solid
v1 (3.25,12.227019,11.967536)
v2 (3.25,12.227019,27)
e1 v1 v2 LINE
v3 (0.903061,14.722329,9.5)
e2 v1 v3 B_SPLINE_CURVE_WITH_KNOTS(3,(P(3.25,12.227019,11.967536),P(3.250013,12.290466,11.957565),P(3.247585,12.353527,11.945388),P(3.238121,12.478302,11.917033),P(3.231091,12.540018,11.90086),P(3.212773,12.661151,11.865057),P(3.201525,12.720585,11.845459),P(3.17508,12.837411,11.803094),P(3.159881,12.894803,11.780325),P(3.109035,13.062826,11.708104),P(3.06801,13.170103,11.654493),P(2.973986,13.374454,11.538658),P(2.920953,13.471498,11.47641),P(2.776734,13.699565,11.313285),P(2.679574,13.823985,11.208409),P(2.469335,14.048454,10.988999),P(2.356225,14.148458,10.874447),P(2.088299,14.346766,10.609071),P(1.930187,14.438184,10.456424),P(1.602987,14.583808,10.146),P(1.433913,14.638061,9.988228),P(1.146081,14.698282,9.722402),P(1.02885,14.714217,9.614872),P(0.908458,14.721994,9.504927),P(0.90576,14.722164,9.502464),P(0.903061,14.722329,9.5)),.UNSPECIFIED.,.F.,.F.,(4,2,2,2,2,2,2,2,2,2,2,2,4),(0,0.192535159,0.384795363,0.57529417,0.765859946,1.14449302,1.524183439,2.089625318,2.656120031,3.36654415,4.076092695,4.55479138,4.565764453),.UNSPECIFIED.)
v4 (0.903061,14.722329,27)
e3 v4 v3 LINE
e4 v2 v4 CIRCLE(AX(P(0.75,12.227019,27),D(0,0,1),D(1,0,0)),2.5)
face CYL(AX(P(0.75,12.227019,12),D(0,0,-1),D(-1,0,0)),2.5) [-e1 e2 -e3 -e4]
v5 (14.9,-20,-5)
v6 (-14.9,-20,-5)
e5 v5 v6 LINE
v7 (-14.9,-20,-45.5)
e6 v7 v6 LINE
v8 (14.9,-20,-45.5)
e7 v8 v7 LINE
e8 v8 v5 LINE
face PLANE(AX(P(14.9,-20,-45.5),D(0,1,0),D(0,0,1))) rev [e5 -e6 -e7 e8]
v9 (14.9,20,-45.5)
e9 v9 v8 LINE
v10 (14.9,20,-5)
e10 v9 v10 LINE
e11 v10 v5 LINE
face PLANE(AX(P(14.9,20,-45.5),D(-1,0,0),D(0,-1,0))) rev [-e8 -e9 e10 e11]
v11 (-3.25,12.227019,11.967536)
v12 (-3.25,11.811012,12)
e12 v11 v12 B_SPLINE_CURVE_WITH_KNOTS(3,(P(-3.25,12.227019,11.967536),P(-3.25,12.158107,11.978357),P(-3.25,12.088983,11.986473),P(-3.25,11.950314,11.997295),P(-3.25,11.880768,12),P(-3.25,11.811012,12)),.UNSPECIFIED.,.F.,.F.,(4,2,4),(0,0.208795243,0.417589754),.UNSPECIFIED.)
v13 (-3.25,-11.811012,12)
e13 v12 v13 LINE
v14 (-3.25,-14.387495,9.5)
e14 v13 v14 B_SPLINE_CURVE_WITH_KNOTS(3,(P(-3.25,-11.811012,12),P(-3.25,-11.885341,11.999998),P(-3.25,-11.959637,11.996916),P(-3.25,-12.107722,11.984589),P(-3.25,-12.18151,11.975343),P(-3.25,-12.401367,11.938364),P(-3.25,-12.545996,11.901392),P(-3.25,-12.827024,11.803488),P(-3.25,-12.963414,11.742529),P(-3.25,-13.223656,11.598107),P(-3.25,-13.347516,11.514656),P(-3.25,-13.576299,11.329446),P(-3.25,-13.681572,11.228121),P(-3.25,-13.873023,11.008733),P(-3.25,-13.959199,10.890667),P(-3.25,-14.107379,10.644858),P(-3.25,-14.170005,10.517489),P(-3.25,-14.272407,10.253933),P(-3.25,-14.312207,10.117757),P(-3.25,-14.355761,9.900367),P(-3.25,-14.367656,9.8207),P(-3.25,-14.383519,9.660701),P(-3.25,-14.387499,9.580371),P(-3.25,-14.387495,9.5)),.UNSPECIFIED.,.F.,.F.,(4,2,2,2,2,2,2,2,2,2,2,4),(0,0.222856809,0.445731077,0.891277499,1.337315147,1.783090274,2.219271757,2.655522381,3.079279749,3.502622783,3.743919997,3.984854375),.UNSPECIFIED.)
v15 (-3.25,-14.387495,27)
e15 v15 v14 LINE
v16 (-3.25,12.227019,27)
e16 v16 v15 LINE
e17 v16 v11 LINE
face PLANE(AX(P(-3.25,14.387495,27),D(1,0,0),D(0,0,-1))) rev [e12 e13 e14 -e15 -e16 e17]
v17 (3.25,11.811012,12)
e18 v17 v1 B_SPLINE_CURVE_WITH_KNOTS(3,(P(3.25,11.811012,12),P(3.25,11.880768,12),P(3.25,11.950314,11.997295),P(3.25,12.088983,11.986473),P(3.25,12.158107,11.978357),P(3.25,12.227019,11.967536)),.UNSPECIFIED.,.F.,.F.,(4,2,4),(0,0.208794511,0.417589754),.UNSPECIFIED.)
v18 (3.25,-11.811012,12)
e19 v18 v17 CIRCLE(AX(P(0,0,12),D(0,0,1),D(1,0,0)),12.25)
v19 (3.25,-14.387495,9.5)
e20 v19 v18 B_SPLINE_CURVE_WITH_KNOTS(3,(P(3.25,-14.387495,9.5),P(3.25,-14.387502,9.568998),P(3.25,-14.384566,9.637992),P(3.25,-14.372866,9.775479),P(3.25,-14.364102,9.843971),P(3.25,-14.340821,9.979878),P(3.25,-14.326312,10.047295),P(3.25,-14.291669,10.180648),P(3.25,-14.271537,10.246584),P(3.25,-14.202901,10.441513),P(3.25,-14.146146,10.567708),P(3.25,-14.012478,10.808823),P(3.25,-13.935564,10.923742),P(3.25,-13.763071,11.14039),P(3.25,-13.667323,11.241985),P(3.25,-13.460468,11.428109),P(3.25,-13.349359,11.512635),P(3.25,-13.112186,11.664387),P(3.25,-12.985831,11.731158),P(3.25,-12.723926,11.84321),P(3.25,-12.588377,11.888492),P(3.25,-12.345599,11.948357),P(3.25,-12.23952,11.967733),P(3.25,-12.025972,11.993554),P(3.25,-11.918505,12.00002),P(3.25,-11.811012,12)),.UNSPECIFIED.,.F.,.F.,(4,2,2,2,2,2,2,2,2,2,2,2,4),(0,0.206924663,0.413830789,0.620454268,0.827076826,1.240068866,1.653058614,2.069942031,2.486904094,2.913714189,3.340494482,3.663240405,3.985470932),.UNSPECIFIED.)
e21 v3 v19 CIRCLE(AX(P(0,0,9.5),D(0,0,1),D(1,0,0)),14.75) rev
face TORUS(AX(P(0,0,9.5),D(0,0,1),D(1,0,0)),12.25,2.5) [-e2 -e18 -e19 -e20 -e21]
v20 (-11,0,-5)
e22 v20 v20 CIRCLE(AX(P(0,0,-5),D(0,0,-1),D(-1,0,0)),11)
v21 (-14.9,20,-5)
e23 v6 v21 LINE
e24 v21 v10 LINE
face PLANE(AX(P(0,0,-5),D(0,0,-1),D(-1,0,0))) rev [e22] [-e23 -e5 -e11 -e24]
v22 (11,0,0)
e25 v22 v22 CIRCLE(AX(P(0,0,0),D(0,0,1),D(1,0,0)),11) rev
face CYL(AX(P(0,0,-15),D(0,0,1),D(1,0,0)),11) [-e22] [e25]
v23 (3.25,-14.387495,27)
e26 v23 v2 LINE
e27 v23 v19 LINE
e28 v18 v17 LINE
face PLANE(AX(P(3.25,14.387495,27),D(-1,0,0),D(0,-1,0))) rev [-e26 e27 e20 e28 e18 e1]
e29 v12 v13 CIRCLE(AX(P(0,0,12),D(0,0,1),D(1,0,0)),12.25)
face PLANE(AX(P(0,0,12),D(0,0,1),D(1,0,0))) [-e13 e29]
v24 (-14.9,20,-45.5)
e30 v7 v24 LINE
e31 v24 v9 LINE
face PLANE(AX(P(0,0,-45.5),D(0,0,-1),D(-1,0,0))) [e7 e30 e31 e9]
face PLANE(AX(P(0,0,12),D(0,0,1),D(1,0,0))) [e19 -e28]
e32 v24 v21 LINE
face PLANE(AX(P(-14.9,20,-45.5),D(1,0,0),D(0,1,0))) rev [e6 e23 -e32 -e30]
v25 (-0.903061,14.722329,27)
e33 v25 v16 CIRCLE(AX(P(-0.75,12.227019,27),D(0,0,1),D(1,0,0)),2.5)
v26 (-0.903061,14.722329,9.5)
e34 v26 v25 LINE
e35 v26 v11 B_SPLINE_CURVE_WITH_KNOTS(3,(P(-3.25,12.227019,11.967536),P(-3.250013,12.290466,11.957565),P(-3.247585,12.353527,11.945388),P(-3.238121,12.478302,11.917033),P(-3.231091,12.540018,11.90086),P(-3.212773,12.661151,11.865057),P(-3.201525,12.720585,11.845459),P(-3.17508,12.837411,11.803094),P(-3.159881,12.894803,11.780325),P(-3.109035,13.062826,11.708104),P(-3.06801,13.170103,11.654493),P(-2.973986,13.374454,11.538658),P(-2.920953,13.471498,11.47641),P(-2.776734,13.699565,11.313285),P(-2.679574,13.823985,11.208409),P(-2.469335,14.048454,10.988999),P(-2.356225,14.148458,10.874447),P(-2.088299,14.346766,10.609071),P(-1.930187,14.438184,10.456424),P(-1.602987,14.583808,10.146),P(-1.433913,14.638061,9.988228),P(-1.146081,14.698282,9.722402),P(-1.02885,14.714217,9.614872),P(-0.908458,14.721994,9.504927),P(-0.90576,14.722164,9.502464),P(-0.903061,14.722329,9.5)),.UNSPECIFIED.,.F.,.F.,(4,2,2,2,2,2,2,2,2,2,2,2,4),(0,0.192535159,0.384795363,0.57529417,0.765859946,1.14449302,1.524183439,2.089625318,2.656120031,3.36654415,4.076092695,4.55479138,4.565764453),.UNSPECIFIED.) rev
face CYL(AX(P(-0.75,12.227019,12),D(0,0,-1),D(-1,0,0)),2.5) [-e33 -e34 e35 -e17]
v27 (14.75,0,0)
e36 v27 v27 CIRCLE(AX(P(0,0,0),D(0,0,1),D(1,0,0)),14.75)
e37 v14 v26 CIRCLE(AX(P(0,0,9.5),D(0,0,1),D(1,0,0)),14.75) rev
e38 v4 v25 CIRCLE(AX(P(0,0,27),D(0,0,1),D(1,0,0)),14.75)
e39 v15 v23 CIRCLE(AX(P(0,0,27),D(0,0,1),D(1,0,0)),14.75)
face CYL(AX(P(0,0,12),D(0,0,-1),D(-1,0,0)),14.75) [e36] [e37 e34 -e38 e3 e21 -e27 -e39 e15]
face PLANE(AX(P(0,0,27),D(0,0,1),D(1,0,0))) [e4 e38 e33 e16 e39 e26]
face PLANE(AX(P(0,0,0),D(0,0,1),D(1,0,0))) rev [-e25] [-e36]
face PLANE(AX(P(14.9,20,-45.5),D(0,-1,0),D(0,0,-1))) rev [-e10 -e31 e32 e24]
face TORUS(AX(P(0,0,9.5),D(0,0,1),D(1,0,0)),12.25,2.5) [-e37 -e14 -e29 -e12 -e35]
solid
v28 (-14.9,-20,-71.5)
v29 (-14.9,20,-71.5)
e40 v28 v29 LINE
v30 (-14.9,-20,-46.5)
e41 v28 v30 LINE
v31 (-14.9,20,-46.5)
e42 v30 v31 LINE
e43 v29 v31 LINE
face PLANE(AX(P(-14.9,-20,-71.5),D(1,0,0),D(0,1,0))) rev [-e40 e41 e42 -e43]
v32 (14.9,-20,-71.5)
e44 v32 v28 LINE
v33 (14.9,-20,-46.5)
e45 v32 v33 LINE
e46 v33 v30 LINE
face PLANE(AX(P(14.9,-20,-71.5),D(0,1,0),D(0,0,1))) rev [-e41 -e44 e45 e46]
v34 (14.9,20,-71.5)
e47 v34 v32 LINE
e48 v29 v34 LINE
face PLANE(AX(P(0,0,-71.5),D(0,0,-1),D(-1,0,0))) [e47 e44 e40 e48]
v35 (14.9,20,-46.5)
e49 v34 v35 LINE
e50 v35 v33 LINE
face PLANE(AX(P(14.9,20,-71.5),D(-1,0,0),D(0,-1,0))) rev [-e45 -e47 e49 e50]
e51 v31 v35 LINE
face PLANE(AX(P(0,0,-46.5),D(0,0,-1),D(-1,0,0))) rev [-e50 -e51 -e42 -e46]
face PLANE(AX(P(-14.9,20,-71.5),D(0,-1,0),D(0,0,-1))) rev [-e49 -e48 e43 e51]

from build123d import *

# Parameters (mm, degrees)
SKETCH1_R           = 14.75
BOSS_EXTRUDE1_DEPTH = 12
BOSS_EXTRUDE2_DEPTH = 15
FILLET1_START       = 12
FILLET1_DEPTH       = 16
FILLET1_START_2     = 9.4999999
FILLET1_2_DEPTH     = 2.5000001
SKETCH3_R           = 11
BOSS_EXTRUDE3_DEPTH = 15
BOSS_EXTRUDE4_START = 5
SKETCH4_W           = 29.8
SKETCH4_H           = 40
BOSS_EXTRUDE4_DEPTH = 40.5
BOSS_EXTRUDE6_START = 1
SKETCH6_W           = 29.8
SKETCH6_H           = 40
BOSS_EXTRUDE6_DEPTH = 25


with BuildPart() as part:
    # Sketch1 → Boss-Extrude1 (new body)
    with BuildSketch(Plane.XY):
        Circle(SKETCH1_R)
    extrude(amount=BOSS_EXTRUDE1_DEPTH)

    # Sketch2 → Boss-Extrude2 (add)
    with BuildSketch(Plane.XY.offset(12)):
        with BuildLine():
            Line((-3.25, 14.38749457), (-3.25, -14.38749457))
            ThreePointArc((-3.25, -14.38749457), (0, -14.75), (3.25, -14.38749457))
            Line((3.25, -14.38749457), (3.25, 14.38749457))
            ThreePointArc((3.25, 14.38749457), (0, 14.75), (-3.25, 14.38749457))
        make_face()
    extrude(amount=BOSS_EXTRUDE2_DEPTH)

    # Fillet1: read off the stored shape, not the designer's step
    # Fillet1 outline → Fillet1 (cut)
    with BuildSketch(Plane.XY.offset(FILLET1_START)):
        with BuildLine():
            Line((-3.25, 14.38749457), (-3.25, 12.227019261))
            ThreePointArc((-3.25, 12.227019261), (-2.571078397, 13.939816234), (-0.903061224, 14.722329314))
            ThreePointArc((-0.903061224, 14.722329314), (-2.083268576, 14.602139982), (-3.25, 14.38749457))
        make_face()
        with BuildLine():
            ThreePointArc((3.25, 14.38749457), (2.083268576, 14.602139982), (0.903061224, 14.722329314))
            ThreePointArc((0.903061224, 14.722329314), (2.571078397, 13.939816234), (3.25, 12.227019261))
            Line((3.25, 12.227019261), (3.25, 14.38749457))
        make_face()
    extrude(amount=FILLET1_DEPTH, mode=Mode.SUBTRACT)

    # Fillet1 2 outline → Fillet1 2 (cut)
    with BuildSketch(Plane.XY.offset(FILLET1_START_2)):
        with BuildLine():
            Line((-3.25, -14.38749457), (-3.25, 12.227019261))
            ThreePointArc((-3.25, 12.227019261), (-2.571078397, 13.939816234), (-0.903061224, 14.722329314))
            ThreePointArc((-0.903061224, 14.722329314), (-14.702293733, 1.185351838), (-3.25, -14.38749457))
        make_face()
        with BuildLine():
            ThreePointArc((3.25, -14.38749457), (14.702293733, 1.185351838), (0.903061224, 14.722329314))
            ThreePointArc((0.903061224, 14.722329314), (2.571078397, 13.939816234), (3.25, 12.227019261))
            Line((3.25, 12.227019261), (3.25, -14.38749457))
        make_face()
    extrude(amount=FILLET1_2_DEPTH, mode=Mode.SUBTRACT)

    # Fillet1 3 outline → Fillet1 3 (revolve)
    with BuildSketch(Plane.XZ):
        with BuildLine():
            Line((12.25, 12), (0, 12))
            Line((0, 12), (0, 9.4999999))
            Line((0, 9.4999999), (14.75, 9.5))
            ThreePointArc((14.75, 9.5), (14.017766953, 11.267766953), (12.25, 12))
        make_face()
    revolve(axis=Axis((0, 0, 0), (0, 0, 1)))

    # Sketch3 → Boss-Extrude3 (add)
    with BuildSketch(Plane(origin=(0, 0, 0), x_dir=(-1, 0, 0), z_dir=(0, 0, -1))):
        with Locations(Location((0, 0, 0), (0, 0, 180))):
            Circle(SKETCH3_R)
    extrude(amount=BOSS_EXTRUDE3_DEPTH)

    # Sketch4 → Boss-Extrude4 (add)
    with BuildSketch(Plane(origin=(0, 0, 0), x_dir=(-1, 0, 0), z_dir=(0, 0, -1)).offset(BOSS_EXTRUDE4_START)):
        Rectangle(SKETCH4_W, SKETCH4_H)
    extrude(amount=BOSS_EXTRUDE4_DEPTH)


with BuildPart() as body_2:
    # Sketch6 → Boss-Extrude6 (new body)
    with BuildSketch(Plane(origin=(0, 0, -45.5), x_dir=(-1, 0, 0), z_dir=(0, 0, -1)).offset(BOSS_EXTRUDE6_START)):
        Rectangle(SKETCH6_W, SKETCH6_H)
    extrude(amount=BOSS_EXTRUDE6_DEPTH)


solid = Compound([part.part, body_2.part])
